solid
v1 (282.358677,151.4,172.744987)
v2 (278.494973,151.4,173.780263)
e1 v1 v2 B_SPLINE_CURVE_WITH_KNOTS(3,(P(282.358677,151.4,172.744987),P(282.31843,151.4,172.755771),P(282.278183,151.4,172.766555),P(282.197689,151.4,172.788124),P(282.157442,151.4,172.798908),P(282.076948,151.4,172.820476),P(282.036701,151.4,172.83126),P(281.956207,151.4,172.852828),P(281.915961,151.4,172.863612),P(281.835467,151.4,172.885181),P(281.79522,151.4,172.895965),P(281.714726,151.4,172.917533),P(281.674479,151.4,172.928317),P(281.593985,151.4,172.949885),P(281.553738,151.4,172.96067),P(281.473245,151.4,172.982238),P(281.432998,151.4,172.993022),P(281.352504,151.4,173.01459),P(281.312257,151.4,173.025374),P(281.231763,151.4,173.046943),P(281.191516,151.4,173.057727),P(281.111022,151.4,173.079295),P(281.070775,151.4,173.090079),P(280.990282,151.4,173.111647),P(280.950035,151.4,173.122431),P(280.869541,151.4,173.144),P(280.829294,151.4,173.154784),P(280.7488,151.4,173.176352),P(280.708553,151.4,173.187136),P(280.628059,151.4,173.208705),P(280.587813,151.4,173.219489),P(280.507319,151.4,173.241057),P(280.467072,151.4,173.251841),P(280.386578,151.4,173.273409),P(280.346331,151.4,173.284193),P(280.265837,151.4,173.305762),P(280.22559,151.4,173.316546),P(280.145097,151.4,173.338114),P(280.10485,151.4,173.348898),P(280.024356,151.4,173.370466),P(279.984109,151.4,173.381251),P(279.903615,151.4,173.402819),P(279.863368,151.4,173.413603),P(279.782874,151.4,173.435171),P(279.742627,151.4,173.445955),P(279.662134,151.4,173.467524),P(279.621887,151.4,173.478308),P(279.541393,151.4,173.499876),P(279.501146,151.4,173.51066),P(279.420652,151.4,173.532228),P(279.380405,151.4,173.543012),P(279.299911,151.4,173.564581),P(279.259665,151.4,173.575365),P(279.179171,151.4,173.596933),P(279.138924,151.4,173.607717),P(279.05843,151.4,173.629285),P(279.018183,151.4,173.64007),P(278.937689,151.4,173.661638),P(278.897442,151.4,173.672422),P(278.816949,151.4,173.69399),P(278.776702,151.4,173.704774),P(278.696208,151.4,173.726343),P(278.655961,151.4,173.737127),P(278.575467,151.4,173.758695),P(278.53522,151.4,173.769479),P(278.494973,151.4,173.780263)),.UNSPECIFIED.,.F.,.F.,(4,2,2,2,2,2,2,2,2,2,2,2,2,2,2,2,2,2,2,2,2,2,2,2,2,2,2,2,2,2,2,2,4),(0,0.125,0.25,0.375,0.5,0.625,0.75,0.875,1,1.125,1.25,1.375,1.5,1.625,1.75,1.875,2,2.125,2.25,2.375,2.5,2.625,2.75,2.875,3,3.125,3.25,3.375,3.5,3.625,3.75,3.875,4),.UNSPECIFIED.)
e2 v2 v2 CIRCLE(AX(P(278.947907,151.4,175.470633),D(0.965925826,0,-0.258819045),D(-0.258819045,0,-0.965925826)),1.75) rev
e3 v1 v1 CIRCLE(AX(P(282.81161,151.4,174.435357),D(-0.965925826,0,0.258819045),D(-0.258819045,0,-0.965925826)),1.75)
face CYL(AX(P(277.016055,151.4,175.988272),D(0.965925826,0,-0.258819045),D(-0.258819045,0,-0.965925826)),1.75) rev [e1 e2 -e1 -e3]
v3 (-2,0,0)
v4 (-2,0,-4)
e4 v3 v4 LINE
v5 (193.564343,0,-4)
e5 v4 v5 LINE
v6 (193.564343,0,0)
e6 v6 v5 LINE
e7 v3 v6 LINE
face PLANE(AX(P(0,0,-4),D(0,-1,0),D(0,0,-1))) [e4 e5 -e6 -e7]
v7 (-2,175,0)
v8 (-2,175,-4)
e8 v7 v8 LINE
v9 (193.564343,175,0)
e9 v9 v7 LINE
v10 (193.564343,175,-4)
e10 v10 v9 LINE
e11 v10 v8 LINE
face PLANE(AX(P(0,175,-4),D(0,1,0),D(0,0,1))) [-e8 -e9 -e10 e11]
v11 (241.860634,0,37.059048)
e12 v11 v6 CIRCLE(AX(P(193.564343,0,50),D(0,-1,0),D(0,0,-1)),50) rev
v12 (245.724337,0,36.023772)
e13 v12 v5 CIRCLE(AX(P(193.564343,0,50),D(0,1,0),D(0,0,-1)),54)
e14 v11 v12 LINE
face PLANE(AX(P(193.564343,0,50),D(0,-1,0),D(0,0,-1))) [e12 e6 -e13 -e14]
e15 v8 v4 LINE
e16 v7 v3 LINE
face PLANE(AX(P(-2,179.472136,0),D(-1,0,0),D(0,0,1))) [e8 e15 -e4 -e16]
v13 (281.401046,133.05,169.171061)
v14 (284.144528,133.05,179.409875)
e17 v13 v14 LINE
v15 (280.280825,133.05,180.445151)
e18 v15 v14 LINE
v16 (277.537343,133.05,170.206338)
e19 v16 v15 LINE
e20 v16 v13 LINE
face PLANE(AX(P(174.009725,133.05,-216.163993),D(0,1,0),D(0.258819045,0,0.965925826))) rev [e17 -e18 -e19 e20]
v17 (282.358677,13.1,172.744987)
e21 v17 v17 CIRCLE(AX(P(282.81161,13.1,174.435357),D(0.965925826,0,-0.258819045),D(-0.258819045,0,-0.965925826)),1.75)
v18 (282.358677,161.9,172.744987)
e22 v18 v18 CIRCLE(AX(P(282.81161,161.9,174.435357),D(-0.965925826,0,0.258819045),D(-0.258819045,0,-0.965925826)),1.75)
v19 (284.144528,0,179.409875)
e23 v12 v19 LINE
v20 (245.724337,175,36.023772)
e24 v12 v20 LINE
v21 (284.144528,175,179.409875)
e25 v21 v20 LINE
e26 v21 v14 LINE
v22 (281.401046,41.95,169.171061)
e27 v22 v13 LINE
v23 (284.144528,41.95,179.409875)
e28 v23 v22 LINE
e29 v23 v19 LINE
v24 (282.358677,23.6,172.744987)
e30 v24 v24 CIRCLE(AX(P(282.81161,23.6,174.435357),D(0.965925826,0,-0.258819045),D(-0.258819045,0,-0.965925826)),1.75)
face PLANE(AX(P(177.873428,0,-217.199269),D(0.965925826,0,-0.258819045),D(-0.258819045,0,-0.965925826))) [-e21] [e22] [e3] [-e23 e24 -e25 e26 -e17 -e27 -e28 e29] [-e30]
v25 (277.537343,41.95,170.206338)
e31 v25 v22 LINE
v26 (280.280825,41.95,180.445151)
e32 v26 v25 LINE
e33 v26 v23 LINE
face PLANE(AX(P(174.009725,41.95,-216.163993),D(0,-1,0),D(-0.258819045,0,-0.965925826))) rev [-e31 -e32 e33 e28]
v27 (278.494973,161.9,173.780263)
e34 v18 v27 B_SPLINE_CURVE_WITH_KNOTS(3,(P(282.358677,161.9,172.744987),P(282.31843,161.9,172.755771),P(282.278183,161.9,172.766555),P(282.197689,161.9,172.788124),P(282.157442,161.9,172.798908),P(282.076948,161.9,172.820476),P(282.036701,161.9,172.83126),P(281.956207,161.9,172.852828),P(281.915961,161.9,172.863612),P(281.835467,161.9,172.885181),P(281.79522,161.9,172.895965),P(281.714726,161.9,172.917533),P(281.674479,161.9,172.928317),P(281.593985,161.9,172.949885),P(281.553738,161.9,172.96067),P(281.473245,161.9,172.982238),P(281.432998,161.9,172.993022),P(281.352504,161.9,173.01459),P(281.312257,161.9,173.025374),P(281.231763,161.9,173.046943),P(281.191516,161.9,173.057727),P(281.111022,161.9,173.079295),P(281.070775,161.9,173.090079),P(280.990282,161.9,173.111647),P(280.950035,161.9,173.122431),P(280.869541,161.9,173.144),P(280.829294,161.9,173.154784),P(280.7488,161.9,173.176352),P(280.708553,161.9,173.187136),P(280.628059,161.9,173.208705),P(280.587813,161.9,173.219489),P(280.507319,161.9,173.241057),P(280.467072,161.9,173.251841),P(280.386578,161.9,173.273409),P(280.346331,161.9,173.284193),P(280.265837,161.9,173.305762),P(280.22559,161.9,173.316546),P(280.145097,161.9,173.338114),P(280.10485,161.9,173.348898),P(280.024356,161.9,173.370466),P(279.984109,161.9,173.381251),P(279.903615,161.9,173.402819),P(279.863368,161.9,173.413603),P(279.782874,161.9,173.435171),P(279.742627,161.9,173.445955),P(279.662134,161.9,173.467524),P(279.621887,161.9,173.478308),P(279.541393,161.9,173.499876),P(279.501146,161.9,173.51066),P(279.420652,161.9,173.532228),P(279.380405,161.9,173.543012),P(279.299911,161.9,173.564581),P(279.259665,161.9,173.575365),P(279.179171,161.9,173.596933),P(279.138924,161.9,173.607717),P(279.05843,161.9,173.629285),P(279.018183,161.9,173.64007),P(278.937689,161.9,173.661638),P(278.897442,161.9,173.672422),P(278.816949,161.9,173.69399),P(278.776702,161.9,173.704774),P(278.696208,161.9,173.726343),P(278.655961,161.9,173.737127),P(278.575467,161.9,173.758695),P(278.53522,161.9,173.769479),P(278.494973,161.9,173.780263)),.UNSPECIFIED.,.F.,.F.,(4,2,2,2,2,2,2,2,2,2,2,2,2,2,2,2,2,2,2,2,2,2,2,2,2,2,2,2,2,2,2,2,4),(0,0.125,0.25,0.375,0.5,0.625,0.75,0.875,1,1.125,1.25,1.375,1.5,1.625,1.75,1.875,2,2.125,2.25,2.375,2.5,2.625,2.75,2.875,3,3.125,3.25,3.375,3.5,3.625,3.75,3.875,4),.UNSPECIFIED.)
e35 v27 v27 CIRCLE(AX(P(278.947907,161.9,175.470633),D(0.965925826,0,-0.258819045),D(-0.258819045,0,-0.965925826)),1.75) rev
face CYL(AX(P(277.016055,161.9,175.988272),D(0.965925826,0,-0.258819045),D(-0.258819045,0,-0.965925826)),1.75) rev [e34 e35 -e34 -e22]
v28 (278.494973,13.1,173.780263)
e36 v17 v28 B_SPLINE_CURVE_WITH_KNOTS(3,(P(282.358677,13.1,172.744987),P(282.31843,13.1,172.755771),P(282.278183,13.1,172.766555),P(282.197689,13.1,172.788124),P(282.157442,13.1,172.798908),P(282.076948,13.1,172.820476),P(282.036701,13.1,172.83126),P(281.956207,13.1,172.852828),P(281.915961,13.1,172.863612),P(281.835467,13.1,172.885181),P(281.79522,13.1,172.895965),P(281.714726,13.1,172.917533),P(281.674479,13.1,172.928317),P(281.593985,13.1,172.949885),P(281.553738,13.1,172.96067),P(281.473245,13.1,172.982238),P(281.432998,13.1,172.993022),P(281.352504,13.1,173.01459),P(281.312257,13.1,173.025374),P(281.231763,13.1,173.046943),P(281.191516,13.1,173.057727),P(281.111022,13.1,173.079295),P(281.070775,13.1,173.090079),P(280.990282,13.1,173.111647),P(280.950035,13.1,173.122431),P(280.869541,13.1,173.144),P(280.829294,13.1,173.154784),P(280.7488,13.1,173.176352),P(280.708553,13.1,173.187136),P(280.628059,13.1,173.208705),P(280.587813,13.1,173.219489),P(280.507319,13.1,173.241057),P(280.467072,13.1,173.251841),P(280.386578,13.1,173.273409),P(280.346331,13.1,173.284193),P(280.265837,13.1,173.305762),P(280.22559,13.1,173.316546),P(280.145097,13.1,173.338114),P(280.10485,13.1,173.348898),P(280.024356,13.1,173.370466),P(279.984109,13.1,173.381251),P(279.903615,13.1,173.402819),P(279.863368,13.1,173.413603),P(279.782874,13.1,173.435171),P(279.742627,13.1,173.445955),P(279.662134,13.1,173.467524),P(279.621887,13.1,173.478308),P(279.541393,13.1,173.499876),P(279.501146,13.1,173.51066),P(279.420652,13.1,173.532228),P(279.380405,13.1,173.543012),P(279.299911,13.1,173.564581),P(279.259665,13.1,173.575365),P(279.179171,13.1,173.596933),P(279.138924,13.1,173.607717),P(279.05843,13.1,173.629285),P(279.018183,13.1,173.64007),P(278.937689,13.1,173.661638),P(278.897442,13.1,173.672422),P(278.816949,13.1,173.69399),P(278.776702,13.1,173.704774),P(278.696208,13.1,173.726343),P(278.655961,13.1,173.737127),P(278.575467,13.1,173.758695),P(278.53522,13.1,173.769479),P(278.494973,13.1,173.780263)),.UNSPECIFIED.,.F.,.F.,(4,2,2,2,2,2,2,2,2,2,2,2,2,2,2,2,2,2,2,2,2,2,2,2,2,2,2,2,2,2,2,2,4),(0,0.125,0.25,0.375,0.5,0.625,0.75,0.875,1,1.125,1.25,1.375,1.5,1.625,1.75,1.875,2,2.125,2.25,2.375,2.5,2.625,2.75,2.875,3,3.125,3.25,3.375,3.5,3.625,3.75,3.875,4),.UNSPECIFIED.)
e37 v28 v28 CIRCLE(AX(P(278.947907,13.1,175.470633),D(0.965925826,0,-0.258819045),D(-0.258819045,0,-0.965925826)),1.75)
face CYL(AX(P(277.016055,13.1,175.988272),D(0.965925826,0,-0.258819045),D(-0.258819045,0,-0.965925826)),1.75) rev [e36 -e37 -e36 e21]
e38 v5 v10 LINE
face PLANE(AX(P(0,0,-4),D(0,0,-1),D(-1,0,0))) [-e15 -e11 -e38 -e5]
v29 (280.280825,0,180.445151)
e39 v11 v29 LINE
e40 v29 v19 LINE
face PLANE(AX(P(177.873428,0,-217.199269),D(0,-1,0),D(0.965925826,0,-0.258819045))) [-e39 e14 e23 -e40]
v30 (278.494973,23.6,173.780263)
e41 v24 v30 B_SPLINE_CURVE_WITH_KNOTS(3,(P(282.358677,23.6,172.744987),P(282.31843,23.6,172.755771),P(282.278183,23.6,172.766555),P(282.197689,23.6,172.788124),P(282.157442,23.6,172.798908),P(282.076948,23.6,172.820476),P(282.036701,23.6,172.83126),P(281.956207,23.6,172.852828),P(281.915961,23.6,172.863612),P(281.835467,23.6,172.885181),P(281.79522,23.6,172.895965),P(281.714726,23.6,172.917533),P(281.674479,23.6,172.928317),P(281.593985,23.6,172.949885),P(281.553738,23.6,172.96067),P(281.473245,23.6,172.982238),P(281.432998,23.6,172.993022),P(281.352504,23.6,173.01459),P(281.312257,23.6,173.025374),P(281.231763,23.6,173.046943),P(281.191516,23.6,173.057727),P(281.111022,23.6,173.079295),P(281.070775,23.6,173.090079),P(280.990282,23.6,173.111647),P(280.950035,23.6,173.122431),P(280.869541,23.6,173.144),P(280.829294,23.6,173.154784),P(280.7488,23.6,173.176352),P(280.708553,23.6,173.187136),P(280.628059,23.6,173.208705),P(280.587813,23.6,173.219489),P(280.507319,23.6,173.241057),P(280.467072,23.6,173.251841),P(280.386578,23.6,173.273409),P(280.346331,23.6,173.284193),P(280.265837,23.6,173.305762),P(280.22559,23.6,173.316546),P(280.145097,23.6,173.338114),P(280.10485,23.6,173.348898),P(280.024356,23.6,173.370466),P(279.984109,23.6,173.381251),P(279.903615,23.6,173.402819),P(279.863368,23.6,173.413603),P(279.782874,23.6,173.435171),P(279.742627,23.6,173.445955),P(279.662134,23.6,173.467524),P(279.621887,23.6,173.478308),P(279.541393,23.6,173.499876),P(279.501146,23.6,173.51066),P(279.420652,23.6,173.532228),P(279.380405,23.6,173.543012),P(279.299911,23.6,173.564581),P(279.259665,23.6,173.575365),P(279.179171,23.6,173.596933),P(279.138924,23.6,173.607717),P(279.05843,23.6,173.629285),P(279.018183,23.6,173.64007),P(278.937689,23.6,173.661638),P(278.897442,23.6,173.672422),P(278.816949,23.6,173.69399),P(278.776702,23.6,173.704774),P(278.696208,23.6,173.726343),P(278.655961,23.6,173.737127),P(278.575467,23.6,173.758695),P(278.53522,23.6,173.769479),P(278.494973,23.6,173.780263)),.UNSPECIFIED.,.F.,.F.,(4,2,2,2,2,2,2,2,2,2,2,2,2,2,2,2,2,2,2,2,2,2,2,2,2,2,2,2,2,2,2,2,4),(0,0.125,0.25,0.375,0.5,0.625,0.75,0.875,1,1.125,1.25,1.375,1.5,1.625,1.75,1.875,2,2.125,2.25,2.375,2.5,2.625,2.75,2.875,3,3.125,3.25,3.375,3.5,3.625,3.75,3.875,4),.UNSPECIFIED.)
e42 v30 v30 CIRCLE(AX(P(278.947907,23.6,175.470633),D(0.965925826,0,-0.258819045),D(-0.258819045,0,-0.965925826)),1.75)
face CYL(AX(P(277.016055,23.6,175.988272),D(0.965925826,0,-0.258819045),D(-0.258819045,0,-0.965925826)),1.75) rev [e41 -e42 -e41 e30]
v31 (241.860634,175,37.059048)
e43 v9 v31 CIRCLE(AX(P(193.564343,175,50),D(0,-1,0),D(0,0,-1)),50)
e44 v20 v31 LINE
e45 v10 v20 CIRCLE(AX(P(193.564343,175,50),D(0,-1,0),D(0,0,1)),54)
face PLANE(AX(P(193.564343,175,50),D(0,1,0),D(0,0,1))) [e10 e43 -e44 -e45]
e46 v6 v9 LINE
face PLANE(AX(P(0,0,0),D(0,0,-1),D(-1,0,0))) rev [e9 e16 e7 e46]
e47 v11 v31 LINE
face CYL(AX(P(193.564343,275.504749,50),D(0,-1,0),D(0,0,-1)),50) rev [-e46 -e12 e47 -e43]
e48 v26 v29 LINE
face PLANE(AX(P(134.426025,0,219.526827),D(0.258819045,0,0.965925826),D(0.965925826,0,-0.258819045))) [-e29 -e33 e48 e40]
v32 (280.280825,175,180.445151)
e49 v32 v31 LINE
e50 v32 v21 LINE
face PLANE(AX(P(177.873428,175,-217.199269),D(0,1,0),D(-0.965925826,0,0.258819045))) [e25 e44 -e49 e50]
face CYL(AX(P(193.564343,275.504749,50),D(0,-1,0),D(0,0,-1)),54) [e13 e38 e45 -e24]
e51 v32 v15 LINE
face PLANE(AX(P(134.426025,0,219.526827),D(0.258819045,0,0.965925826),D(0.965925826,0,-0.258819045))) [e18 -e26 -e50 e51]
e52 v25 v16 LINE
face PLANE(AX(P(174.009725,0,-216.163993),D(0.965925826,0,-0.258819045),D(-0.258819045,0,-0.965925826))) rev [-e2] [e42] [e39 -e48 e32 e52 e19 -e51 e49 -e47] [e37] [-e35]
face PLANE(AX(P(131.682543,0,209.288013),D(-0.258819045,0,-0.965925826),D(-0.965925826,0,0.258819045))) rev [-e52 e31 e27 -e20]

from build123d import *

# Parameters (mm, degrees)
ESBO_O1_W                = 425
ESBO_O1_H                = 175
FLANGE_BASE1_DEPTH       = 4
ESBO_O11_W               = 10.6
ESBO_O11_H               = 90.6
CORTE_EXTRUS_O2_DEPTH    = 155
DOBRA_ESBO_ADA1_DEPTH    = 175
DOBRA_ESBO_ADA1_2_DEPTH  = 175
DOBRA_ESBO_ADA1_3_DEPTH  = 42.2
DOBRA_START              = 132.8
DOBRA_ESBO_ADA1_4_DEPTH  = 42.2
ESBO_O14_R               = 1.75
CORTE_EXTRUS_O3_DEPTH    = 6
ESBO_O15_W               = 10.6
ESBO_O15_H               = 91.1
CORTE_EXTRUS_O4_DEPTH    = 44
ESBO_O16_W               = 2
ESBO_O16_H               = 4
RESSALTO_EXTRUS_O1_DEPTH = 175


# Read off the part's stored shape, not the designer's step: Dobra esboçada1
# Sheet-metal steps are written as plain solids
with BuildPart() as part:
    # Esboço1 → Flange-base1 (new body)
    with BuildSketch(Plane.XY):
        with Locations((212.5, 87.5)):
            Rectangle(ESBO_O1_W, ESBO_O1_H)
    extrude(amount=-FLANGE_BASE1_DEPTH)

    # Esboço11 → Corte-extrusão2 (cut)
    with BuildSketch(Plane(origin=(0, 0, -4), x_dir=(-1, 0, 0), z_dir=(0, 0, -1))):
        Polygon((-425, 175), (-425, 0), (-410.6, 0), (-410.6, 42.2), (-410.6, 132.8), (-410.6, 175), align=None)
        with Locations((-405.3, 87.5)):
            Rectangle(ESBO_O11_W, ESBO_O11_H)
    extrude(amount=-CORTE_EXTRUS_O2_DEPTH, mode=Mode.SUBTRACT)

    # Dobra esboçada1 outline → Dobra esboçada1 (cut)
    with BuildSketch(Plane(origin=(0, 0, 0), x_dir=(1, 0, 0), z_dir=(0, 1, 0))):
        with BuildLine():
            ThreePointArc((193.564342649, 4), (203.956647495, 2.990565198), (213.960420704, 0))
            Line((213.960420704, 0), (410.6, 0))
            Line((410.6, 0), (410.6, 4))
            Line((410.6, 4), (193.564342649, 4))
        make_face()
    extrude(amount=DOBRA_ESBO_ADA1_DEPTH, mode=Mode.SUBTRACT)

    # Dobra esbo_ada1 2 outline → Dobra esbo_ada1 2 (add)
    with BuildSketch(Plane(origin=(0, 0, 0), x_dir=(1, 0, 0), z_dir=(0, 1, 0))):
        with BuildLine():
            Line((277.537342774, -170.206337672), (281.401046079, -169.171061491))
            Line((281.401046079, -169.171061491), (245.724337269, -36.023771564))
            ThreePointArc((245.724337269, -36.023771564), (234.067724606, -14.286192444), (213.960420704, 0))
            Line((213.960420704, 0), (193.564342649, 0))
            ThreePointArc((193.564342649, 0), (224.0024141, -10.332332985), (241.860633964, -37.059047745))
            Line((241.860633964, -37.059047745), (277.537342774, -170.206337672))
        make_face()
    extrude(amount=DOBRA_ESBO_ADA1_2_DEPTH)

    # Dobra esbo_ada1 3 outline → Dobra esbo_ada1 3 (add)
    with BuildSketch(Plane(origin=(0, 0, 0), x_dir=(1, 0, 0), z_dir=(0, 1, 0))):
        Polygon((280.280824652, -180.44515143), (284.144527957, -179.40987525), (281.401046079, -169.171061491), (277.537342774, -170.206337672), align=None)
    extrude(amount=DOBRA_ESBO_ADA1_3_DEPTH)

    # Dobra esbo_ada1 4 outline → Dobra esbo_ada1 4 (add)
    with BuildSketch(Plane(origin=(0, 0, 0), x_dir=(1, 0, 0), z_dir=(0, 1, 0)).offset(DOBRA_START)):
        Polygon((280.280824652, -180.44515143), (284.144527957, -179.40987525), (281.401046079, -169.171061491), (277.537342774, -170.206337672), align=None)
    extrude(amount=DOBRA_ESBO_ADA1_4_DEPTH)

    # Esboço14 → Corte-extrusão3 (cut)
    with BuildSketch(Plane(origin=(220.257984945, 0, -59.017949192), x_dir=(-0.25881904510251796, 0, -0.9659258262890691), z_dir=(0.9659258262890691, 0, -0.25881904510251796))):
        with Locations((-241.688647392, 13.1)):
            Circle(ESBO_O14_R)
        with Locations((-241.688647392, 23.6)):
            Circle(ESBO_O14_R)
    corte_extrus_o3 = extrude(amount=-CORTE_EXTRUS_O3_DEPTH, mode=Mode.SUBTRACT)

    # Espelhar1: Corte-extrusão3 across plane
    add(corte_extrus_o3.mirror(Plane(origin=(0, 87.5, 0), x_dir=(0, 0, 1), z_dir=(0, -1, 0))), mode=Mode.SUBTRACT)

    # Esboço15 → Corte-extrusão4 (cut)
    with BuildSketch(Plane(origin=(220.257984945, 0, -59.017949192), x_dir=(-0.25881904510251796, 0, -0.9659258262890691), z_dir=(0.9659258262890691, 0, -0.25881904510251796))):
        with Locations((-241.538647392, 87.5)):
            Rectangle(ESBO_O15_W, ESBO_O15_H)
    extrude(amount=-CORTE_EXTRUS_O4_DEPTH, mode=Mode.SUBTRACT)

    # Esboço16 → Ressalto-extrusão1 (add)
    with BuildSketch(Plane.XZ):
        with Locations((-1, -2)):
            Rectangle(ESBO_O16_W, ESBO_O16_H)
    extrude(amount=-RESSALTO_EXTRUS_O1_DEPTH)


solid = part.part
